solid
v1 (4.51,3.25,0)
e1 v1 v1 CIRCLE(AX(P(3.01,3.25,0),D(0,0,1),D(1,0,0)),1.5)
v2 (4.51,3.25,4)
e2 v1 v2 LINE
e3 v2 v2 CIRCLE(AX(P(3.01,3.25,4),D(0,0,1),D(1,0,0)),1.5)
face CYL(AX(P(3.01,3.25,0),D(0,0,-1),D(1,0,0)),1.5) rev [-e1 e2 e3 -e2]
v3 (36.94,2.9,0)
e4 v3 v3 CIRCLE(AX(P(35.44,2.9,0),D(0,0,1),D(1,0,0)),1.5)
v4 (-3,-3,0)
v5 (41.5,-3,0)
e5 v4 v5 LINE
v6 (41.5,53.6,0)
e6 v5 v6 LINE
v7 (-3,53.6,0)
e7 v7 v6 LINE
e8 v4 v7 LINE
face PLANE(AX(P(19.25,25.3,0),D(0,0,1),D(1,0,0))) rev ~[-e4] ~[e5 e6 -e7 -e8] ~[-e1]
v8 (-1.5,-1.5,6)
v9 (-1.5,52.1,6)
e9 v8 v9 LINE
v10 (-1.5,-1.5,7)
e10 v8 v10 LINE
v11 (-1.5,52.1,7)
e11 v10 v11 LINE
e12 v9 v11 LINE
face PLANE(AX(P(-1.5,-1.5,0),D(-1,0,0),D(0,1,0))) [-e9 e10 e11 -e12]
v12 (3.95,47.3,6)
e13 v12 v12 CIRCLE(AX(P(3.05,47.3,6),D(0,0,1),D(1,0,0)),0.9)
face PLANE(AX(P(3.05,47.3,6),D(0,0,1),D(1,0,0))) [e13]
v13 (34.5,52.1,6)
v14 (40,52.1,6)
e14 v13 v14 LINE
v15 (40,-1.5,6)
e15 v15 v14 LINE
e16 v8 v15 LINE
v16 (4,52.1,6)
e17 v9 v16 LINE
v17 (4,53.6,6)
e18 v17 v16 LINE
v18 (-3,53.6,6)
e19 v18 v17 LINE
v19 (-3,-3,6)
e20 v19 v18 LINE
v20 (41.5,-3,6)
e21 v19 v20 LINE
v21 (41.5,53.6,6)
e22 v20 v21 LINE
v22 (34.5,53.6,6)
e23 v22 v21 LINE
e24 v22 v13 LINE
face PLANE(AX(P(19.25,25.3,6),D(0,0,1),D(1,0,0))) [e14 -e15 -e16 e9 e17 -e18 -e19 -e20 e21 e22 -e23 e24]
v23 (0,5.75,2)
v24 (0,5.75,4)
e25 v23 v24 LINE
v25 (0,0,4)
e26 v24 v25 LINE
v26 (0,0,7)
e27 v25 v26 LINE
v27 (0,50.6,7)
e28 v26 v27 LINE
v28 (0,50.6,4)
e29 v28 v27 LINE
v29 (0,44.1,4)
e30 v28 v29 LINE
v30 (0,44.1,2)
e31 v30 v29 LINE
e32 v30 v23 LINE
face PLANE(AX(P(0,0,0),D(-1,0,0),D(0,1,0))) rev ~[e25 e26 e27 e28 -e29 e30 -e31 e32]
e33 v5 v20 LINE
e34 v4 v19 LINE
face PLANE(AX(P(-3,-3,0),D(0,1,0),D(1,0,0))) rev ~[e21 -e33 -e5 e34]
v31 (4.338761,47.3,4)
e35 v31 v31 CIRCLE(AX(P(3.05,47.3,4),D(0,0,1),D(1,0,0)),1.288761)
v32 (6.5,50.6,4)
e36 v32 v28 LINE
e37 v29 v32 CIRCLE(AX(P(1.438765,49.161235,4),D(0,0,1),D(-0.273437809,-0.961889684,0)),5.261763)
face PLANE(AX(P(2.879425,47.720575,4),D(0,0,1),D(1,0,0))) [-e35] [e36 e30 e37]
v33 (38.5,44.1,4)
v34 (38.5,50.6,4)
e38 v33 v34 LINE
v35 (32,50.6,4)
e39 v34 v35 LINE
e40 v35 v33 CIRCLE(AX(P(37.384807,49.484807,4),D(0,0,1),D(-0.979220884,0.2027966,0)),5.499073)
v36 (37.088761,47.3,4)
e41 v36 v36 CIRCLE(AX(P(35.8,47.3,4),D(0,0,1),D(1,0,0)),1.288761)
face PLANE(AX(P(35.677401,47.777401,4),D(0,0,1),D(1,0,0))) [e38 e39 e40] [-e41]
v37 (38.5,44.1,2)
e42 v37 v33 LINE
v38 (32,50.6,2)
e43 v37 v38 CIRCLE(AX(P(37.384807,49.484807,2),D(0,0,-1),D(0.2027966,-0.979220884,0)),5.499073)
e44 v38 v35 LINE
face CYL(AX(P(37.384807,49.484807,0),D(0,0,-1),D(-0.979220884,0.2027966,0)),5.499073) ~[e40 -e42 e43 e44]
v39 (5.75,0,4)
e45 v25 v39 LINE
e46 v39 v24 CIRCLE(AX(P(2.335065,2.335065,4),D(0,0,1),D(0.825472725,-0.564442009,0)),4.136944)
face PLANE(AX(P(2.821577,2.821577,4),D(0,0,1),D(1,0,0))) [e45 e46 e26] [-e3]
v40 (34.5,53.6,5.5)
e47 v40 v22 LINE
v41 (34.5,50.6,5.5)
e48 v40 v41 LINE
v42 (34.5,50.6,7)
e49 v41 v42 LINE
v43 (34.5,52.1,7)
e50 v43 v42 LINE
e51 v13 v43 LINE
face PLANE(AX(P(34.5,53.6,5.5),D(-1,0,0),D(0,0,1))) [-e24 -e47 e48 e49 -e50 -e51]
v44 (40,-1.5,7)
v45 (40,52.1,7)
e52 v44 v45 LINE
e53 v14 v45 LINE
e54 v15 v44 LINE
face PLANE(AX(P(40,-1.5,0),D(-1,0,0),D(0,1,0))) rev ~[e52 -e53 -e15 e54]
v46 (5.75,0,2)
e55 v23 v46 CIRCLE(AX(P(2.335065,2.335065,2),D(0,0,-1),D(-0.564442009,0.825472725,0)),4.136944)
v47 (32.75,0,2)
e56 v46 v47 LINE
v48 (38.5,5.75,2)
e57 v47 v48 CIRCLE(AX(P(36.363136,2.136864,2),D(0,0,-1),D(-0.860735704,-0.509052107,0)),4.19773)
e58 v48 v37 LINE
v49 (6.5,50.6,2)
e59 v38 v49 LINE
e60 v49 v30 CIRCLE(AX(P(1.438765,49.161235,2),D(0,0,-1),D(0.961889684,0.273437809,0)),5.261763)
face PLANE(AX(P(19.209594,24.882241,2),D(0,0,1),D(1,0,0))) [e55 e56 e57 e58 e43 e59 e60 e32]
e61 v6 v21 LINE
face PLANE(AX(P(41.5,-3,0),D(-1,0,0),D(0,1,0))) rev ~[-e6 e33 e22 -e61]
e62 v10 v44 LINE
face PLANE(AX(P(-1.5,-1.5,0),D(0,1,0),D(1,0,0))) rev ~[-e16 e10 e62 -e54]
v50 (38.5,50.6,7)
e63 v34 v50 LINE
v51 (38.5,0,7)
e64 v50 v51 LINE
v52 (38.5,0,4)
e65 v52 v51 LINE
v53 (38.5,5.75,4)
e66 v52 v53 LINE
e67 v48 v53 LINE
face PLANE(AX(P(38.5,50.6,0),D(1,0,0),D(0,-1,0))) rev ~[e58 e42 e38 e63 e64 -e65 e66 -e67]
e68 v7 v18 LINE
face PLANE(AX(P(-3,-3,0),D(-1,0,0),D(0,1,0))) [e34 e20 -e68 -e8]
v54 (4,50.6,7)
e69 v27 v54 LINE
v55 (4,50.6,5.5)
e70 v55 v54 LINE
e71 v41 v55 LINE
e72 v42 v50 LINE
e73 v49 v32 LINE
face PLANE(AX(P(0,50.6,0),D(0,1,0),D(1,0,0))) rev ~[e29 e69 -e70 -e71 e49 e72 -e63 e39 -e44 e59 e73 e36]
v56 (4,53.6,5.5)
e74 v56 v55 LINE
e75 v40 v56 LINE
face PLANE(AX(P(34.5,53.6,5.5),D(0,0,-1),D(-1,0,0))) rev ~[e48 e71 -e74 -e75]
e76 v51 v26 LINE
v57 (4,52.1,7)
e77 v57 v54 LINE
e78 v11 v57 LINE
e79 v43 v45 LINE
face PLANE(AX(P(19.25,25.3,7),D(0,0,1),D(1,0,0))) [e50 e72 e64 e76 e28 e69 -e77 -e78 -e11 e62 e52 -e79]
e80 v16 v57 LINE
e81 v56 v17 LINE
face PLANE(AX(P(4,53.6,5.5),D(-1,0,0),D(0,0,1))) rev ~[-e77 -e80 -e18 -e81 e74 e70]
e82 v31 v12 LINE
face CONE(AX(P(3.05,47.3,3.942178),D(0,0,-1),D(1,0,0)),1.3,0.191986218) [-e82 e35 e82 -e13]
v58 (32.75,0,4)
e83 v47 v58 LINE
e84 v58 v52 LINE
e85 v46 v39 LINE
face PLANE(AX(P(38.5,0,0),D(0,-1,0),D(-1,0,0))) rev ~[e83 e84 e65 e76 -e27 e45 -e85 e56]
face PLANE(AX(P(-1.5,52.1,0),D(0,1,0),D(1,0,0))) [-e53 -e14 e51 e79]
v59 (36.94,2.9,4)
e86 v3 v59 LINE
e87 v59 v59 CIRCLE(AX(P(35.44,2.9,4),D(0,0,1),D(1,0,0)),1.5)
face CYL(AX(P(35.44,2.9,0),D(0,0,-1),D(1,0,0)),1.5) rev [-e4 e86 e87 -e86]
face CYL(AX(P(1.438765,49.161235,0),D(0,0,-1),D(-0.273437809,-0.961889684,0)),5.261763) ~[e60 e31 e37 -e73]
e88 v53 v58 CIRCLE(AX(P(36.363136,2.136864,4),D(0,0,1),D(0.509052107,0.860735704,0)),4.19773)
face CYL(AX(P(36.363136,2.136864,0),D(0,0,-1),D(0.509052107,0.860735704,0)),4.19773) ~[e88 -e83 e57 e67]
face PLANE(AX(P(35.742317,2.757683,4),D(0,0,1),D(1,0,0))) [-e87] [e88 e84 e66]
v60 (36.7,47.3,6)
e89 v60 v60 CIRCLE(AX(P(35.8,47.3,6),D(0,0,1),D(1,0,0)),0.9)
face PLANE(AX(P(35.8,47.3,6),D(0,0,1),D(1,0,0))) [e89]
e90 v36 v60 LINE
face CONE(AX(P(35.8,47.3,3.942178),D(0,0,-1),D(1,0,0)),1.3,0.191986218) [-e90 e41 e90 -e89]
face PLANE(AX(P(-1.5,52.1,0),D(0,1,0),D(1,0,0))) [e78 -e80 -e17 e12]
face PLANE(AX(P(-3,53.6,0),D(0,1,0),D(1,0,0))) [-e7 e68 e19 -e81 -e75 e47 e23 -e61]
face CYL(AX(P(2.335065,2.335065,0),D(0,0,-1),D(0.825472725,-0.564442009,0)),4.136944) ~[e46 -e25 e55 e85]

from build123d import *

# Parameters (mm, degrees)
F1_DEPTH = 2
F0_R     = 1.3
F0_R_2   = 1.5
F2_DEPTH = 4
F3_DEPTH = 6
F0_W     = 41.5
F0_H     = 53.6
F4_DEPTH = 7
F0_W_2   = 44.5
F0_H_2   = 56.6
F5_DEPTH = 6
F6_W     = 30.5
F6_H     = 1.5
F7_DEPTH = 3


# Not quite as in the source:
# - a fillet or chamfer that OpenCascade refuses, or shapes differently, is made with other operations: its cross-section is extruded or revolved along the edge and cut away or added
# - a feature names something its author has since deleted; it is built from what else it names


with BuildPart() as f1:
    # F0 (on Top) → F1 (new body)
    with BuildSketch(Plane.XY):
        with BuildLine():
            ThreePointArc((0, 5.75), (5.2603266711, 5.2603266711), (5.75, 0))
            Line((5.75, 0), (32.75, 0))
            ThreePointArc((32.75, 0), (33.3948928082, 5.1051071918), (38.5, 5.75))
            Line((38.5, 5.75), (38.5, 44.1))
            ThreePointArc((38.5, 44.1), (33.4963752154, 45.5963752154), (32, 50.6))
            Line((32, 50.6), (6.5, 50.6))
            ThreePointArc((6.5, 50.6), (5.1593928501, 45.4406071499), (0, 44.1))
            Line((0, 44.1), (0, 5.75))
        make_face()
    extrude(amount=F1_DEPTH)

    # F0 (on Top) → F2 (join)
    with BuildSketch(Plane.XY):
        with BuildLine():
            Line((0, 50.6), (0, 44.1))
            ThreePointArc((0, 44.1), (5.1593928501, 45.4406071499), (6.5, 50.6))
            Line((6.5, 50.6), (0, 50.6))
        make_face()
        with Locations((3.05, 47.3)):
            Circle(F0_R, mode=Mode.SUBTRACT)
        with BuildLine():
            ThreePointArc((32, 50.6), (33.4963752154, 45.5963752154), (38.5, 44.1))
            Line((38.5, 44.1), (38.5, 50.6))
            Line((38.5, 50.6), (32, 50.6))
        make_face()
        with Locations((35.8, 47.3)):
            Circle(F0_R, mode=Mode.SUBTRACT)
        with BuildLine():
            ThreePointArc((38.5, 5.75), (33.3948928082, 5.1051071918), (32.75, 0))
            Line((32.75, 0), (38.5, 0))
            Line((38.5, 0), (38.5, 5.75))
        make_face()
        with Locations((35.44, 2.9)):
            Circle(F0_R_2, mode=Mode.SUBTRACT)
        with BuildLine():
            Line((0, 5.75), (0, 0))
            Line((0, 0), (5.75, 0))
            ThreePointArc((5.75, 0), (5.2603266711, 5.2603266711), (0, 5.75))
        make_face()
        with Locations((3.01, 3.25)):
            Circle(F0_R_2, mode=Mode.SUBTRACT)
    extrude(amount=F2_DEPTH)

    # F0 (on Top) → F3 (join)
    with BuildSketch(Plane.XY):
        with Locations((3.05, 47.3)):
            Circle(F0_R)
        with Locations((35.8, 47.3)):
            Circle(F0_R)
    extrude(amount=F3_DEPTH)

    # F0 (on Top) → F4 (join)
    with BuildSketch(Plane.XY):
        with Locations((19.25, 25.3)):
            Rectangle(F0_W, F0_H)
        Polygon((5.75, 0), (0, 0), (0, 5.75), (0, 44.1), (0, 50.6), (6.5, 50.6), (32, 50.6), (38.5, 50.6), (38.5, 44.1), (38.5, 5.75), (38.5, 0), (32.75, 0), align=None, mode=Mode.SUBTRACT)
    extrude(amount=F4_DEPTH)

    # F0 (on Top) → F5 (join)
    with BuildSketch(Plane.XY):
        with Locations((19.25, 25.3)):
            Rectangle(F0_W_2, F0_H_2)
        with Locations((19.25, 25.3)):
            Rectangle(F0_W, F0_H, mode=Mode.SUBTRACT)
    extrude(amount=F5_DEPTH)

    # F6 (on face) → F7 (cut)
    with BuildSketch(Plane(origin=(0, 53.6, 0), x_dir=(-1, 0, 0), z_dir=(0, 1, 0))):
        with Locations((-19.25, 6.25)):
            Rectangle(F6_W, F6_H)
    extrude(amount=-F7_DEPTH, mode=Mode.SUBTRACT)

    # F8: chamfer of 0.4 x 2.0578216064 on 2 edges, made by hand


with BuildPart() as f8_tool2:
    # F8_s3 → F8_t4 (revolve)
    with BuildSketch(Plane.XZ.offset(-47.3)):
        Polygon((37.1, 3.9421783936), (36.7, 6), (37.1, 6), align=None)
    revolve(axis=Axis((35.8, 47.3, 6), (0, 0, 1)))

    split(bisect_by=Plane.XY.offset(4), keep=Keep.TOP)


with BuildPart() as f1_1:
    add(f1.part)

    # F8_t1: cut F8_tool2
    add(f8_tool2.part, mode=Mode.SUBTRACT)


with BuildPart() as f8_tool7:
    # F8_s8 → F8_t9 (revolve)
    with BuildSketch(Plane.XZ.offset(-47.3)):
        Polygon((4.35, 3.9421783936), (3.95, 6), (4.35, 6), align=None)
    revolve(axis=Axis((3.05, 47.3, 6), (0, 0, 1)))

    split(bisect_by=Plane.XY.offset(4), keep=Keep.TOP)


with BuildPart() as f1_2:
    add(f1_1.part)

    # F8_t6: cut F8_tool7
    add(f8_tool7.part, mode=Mode.SUBTRACT)


solid = f1_2.part
